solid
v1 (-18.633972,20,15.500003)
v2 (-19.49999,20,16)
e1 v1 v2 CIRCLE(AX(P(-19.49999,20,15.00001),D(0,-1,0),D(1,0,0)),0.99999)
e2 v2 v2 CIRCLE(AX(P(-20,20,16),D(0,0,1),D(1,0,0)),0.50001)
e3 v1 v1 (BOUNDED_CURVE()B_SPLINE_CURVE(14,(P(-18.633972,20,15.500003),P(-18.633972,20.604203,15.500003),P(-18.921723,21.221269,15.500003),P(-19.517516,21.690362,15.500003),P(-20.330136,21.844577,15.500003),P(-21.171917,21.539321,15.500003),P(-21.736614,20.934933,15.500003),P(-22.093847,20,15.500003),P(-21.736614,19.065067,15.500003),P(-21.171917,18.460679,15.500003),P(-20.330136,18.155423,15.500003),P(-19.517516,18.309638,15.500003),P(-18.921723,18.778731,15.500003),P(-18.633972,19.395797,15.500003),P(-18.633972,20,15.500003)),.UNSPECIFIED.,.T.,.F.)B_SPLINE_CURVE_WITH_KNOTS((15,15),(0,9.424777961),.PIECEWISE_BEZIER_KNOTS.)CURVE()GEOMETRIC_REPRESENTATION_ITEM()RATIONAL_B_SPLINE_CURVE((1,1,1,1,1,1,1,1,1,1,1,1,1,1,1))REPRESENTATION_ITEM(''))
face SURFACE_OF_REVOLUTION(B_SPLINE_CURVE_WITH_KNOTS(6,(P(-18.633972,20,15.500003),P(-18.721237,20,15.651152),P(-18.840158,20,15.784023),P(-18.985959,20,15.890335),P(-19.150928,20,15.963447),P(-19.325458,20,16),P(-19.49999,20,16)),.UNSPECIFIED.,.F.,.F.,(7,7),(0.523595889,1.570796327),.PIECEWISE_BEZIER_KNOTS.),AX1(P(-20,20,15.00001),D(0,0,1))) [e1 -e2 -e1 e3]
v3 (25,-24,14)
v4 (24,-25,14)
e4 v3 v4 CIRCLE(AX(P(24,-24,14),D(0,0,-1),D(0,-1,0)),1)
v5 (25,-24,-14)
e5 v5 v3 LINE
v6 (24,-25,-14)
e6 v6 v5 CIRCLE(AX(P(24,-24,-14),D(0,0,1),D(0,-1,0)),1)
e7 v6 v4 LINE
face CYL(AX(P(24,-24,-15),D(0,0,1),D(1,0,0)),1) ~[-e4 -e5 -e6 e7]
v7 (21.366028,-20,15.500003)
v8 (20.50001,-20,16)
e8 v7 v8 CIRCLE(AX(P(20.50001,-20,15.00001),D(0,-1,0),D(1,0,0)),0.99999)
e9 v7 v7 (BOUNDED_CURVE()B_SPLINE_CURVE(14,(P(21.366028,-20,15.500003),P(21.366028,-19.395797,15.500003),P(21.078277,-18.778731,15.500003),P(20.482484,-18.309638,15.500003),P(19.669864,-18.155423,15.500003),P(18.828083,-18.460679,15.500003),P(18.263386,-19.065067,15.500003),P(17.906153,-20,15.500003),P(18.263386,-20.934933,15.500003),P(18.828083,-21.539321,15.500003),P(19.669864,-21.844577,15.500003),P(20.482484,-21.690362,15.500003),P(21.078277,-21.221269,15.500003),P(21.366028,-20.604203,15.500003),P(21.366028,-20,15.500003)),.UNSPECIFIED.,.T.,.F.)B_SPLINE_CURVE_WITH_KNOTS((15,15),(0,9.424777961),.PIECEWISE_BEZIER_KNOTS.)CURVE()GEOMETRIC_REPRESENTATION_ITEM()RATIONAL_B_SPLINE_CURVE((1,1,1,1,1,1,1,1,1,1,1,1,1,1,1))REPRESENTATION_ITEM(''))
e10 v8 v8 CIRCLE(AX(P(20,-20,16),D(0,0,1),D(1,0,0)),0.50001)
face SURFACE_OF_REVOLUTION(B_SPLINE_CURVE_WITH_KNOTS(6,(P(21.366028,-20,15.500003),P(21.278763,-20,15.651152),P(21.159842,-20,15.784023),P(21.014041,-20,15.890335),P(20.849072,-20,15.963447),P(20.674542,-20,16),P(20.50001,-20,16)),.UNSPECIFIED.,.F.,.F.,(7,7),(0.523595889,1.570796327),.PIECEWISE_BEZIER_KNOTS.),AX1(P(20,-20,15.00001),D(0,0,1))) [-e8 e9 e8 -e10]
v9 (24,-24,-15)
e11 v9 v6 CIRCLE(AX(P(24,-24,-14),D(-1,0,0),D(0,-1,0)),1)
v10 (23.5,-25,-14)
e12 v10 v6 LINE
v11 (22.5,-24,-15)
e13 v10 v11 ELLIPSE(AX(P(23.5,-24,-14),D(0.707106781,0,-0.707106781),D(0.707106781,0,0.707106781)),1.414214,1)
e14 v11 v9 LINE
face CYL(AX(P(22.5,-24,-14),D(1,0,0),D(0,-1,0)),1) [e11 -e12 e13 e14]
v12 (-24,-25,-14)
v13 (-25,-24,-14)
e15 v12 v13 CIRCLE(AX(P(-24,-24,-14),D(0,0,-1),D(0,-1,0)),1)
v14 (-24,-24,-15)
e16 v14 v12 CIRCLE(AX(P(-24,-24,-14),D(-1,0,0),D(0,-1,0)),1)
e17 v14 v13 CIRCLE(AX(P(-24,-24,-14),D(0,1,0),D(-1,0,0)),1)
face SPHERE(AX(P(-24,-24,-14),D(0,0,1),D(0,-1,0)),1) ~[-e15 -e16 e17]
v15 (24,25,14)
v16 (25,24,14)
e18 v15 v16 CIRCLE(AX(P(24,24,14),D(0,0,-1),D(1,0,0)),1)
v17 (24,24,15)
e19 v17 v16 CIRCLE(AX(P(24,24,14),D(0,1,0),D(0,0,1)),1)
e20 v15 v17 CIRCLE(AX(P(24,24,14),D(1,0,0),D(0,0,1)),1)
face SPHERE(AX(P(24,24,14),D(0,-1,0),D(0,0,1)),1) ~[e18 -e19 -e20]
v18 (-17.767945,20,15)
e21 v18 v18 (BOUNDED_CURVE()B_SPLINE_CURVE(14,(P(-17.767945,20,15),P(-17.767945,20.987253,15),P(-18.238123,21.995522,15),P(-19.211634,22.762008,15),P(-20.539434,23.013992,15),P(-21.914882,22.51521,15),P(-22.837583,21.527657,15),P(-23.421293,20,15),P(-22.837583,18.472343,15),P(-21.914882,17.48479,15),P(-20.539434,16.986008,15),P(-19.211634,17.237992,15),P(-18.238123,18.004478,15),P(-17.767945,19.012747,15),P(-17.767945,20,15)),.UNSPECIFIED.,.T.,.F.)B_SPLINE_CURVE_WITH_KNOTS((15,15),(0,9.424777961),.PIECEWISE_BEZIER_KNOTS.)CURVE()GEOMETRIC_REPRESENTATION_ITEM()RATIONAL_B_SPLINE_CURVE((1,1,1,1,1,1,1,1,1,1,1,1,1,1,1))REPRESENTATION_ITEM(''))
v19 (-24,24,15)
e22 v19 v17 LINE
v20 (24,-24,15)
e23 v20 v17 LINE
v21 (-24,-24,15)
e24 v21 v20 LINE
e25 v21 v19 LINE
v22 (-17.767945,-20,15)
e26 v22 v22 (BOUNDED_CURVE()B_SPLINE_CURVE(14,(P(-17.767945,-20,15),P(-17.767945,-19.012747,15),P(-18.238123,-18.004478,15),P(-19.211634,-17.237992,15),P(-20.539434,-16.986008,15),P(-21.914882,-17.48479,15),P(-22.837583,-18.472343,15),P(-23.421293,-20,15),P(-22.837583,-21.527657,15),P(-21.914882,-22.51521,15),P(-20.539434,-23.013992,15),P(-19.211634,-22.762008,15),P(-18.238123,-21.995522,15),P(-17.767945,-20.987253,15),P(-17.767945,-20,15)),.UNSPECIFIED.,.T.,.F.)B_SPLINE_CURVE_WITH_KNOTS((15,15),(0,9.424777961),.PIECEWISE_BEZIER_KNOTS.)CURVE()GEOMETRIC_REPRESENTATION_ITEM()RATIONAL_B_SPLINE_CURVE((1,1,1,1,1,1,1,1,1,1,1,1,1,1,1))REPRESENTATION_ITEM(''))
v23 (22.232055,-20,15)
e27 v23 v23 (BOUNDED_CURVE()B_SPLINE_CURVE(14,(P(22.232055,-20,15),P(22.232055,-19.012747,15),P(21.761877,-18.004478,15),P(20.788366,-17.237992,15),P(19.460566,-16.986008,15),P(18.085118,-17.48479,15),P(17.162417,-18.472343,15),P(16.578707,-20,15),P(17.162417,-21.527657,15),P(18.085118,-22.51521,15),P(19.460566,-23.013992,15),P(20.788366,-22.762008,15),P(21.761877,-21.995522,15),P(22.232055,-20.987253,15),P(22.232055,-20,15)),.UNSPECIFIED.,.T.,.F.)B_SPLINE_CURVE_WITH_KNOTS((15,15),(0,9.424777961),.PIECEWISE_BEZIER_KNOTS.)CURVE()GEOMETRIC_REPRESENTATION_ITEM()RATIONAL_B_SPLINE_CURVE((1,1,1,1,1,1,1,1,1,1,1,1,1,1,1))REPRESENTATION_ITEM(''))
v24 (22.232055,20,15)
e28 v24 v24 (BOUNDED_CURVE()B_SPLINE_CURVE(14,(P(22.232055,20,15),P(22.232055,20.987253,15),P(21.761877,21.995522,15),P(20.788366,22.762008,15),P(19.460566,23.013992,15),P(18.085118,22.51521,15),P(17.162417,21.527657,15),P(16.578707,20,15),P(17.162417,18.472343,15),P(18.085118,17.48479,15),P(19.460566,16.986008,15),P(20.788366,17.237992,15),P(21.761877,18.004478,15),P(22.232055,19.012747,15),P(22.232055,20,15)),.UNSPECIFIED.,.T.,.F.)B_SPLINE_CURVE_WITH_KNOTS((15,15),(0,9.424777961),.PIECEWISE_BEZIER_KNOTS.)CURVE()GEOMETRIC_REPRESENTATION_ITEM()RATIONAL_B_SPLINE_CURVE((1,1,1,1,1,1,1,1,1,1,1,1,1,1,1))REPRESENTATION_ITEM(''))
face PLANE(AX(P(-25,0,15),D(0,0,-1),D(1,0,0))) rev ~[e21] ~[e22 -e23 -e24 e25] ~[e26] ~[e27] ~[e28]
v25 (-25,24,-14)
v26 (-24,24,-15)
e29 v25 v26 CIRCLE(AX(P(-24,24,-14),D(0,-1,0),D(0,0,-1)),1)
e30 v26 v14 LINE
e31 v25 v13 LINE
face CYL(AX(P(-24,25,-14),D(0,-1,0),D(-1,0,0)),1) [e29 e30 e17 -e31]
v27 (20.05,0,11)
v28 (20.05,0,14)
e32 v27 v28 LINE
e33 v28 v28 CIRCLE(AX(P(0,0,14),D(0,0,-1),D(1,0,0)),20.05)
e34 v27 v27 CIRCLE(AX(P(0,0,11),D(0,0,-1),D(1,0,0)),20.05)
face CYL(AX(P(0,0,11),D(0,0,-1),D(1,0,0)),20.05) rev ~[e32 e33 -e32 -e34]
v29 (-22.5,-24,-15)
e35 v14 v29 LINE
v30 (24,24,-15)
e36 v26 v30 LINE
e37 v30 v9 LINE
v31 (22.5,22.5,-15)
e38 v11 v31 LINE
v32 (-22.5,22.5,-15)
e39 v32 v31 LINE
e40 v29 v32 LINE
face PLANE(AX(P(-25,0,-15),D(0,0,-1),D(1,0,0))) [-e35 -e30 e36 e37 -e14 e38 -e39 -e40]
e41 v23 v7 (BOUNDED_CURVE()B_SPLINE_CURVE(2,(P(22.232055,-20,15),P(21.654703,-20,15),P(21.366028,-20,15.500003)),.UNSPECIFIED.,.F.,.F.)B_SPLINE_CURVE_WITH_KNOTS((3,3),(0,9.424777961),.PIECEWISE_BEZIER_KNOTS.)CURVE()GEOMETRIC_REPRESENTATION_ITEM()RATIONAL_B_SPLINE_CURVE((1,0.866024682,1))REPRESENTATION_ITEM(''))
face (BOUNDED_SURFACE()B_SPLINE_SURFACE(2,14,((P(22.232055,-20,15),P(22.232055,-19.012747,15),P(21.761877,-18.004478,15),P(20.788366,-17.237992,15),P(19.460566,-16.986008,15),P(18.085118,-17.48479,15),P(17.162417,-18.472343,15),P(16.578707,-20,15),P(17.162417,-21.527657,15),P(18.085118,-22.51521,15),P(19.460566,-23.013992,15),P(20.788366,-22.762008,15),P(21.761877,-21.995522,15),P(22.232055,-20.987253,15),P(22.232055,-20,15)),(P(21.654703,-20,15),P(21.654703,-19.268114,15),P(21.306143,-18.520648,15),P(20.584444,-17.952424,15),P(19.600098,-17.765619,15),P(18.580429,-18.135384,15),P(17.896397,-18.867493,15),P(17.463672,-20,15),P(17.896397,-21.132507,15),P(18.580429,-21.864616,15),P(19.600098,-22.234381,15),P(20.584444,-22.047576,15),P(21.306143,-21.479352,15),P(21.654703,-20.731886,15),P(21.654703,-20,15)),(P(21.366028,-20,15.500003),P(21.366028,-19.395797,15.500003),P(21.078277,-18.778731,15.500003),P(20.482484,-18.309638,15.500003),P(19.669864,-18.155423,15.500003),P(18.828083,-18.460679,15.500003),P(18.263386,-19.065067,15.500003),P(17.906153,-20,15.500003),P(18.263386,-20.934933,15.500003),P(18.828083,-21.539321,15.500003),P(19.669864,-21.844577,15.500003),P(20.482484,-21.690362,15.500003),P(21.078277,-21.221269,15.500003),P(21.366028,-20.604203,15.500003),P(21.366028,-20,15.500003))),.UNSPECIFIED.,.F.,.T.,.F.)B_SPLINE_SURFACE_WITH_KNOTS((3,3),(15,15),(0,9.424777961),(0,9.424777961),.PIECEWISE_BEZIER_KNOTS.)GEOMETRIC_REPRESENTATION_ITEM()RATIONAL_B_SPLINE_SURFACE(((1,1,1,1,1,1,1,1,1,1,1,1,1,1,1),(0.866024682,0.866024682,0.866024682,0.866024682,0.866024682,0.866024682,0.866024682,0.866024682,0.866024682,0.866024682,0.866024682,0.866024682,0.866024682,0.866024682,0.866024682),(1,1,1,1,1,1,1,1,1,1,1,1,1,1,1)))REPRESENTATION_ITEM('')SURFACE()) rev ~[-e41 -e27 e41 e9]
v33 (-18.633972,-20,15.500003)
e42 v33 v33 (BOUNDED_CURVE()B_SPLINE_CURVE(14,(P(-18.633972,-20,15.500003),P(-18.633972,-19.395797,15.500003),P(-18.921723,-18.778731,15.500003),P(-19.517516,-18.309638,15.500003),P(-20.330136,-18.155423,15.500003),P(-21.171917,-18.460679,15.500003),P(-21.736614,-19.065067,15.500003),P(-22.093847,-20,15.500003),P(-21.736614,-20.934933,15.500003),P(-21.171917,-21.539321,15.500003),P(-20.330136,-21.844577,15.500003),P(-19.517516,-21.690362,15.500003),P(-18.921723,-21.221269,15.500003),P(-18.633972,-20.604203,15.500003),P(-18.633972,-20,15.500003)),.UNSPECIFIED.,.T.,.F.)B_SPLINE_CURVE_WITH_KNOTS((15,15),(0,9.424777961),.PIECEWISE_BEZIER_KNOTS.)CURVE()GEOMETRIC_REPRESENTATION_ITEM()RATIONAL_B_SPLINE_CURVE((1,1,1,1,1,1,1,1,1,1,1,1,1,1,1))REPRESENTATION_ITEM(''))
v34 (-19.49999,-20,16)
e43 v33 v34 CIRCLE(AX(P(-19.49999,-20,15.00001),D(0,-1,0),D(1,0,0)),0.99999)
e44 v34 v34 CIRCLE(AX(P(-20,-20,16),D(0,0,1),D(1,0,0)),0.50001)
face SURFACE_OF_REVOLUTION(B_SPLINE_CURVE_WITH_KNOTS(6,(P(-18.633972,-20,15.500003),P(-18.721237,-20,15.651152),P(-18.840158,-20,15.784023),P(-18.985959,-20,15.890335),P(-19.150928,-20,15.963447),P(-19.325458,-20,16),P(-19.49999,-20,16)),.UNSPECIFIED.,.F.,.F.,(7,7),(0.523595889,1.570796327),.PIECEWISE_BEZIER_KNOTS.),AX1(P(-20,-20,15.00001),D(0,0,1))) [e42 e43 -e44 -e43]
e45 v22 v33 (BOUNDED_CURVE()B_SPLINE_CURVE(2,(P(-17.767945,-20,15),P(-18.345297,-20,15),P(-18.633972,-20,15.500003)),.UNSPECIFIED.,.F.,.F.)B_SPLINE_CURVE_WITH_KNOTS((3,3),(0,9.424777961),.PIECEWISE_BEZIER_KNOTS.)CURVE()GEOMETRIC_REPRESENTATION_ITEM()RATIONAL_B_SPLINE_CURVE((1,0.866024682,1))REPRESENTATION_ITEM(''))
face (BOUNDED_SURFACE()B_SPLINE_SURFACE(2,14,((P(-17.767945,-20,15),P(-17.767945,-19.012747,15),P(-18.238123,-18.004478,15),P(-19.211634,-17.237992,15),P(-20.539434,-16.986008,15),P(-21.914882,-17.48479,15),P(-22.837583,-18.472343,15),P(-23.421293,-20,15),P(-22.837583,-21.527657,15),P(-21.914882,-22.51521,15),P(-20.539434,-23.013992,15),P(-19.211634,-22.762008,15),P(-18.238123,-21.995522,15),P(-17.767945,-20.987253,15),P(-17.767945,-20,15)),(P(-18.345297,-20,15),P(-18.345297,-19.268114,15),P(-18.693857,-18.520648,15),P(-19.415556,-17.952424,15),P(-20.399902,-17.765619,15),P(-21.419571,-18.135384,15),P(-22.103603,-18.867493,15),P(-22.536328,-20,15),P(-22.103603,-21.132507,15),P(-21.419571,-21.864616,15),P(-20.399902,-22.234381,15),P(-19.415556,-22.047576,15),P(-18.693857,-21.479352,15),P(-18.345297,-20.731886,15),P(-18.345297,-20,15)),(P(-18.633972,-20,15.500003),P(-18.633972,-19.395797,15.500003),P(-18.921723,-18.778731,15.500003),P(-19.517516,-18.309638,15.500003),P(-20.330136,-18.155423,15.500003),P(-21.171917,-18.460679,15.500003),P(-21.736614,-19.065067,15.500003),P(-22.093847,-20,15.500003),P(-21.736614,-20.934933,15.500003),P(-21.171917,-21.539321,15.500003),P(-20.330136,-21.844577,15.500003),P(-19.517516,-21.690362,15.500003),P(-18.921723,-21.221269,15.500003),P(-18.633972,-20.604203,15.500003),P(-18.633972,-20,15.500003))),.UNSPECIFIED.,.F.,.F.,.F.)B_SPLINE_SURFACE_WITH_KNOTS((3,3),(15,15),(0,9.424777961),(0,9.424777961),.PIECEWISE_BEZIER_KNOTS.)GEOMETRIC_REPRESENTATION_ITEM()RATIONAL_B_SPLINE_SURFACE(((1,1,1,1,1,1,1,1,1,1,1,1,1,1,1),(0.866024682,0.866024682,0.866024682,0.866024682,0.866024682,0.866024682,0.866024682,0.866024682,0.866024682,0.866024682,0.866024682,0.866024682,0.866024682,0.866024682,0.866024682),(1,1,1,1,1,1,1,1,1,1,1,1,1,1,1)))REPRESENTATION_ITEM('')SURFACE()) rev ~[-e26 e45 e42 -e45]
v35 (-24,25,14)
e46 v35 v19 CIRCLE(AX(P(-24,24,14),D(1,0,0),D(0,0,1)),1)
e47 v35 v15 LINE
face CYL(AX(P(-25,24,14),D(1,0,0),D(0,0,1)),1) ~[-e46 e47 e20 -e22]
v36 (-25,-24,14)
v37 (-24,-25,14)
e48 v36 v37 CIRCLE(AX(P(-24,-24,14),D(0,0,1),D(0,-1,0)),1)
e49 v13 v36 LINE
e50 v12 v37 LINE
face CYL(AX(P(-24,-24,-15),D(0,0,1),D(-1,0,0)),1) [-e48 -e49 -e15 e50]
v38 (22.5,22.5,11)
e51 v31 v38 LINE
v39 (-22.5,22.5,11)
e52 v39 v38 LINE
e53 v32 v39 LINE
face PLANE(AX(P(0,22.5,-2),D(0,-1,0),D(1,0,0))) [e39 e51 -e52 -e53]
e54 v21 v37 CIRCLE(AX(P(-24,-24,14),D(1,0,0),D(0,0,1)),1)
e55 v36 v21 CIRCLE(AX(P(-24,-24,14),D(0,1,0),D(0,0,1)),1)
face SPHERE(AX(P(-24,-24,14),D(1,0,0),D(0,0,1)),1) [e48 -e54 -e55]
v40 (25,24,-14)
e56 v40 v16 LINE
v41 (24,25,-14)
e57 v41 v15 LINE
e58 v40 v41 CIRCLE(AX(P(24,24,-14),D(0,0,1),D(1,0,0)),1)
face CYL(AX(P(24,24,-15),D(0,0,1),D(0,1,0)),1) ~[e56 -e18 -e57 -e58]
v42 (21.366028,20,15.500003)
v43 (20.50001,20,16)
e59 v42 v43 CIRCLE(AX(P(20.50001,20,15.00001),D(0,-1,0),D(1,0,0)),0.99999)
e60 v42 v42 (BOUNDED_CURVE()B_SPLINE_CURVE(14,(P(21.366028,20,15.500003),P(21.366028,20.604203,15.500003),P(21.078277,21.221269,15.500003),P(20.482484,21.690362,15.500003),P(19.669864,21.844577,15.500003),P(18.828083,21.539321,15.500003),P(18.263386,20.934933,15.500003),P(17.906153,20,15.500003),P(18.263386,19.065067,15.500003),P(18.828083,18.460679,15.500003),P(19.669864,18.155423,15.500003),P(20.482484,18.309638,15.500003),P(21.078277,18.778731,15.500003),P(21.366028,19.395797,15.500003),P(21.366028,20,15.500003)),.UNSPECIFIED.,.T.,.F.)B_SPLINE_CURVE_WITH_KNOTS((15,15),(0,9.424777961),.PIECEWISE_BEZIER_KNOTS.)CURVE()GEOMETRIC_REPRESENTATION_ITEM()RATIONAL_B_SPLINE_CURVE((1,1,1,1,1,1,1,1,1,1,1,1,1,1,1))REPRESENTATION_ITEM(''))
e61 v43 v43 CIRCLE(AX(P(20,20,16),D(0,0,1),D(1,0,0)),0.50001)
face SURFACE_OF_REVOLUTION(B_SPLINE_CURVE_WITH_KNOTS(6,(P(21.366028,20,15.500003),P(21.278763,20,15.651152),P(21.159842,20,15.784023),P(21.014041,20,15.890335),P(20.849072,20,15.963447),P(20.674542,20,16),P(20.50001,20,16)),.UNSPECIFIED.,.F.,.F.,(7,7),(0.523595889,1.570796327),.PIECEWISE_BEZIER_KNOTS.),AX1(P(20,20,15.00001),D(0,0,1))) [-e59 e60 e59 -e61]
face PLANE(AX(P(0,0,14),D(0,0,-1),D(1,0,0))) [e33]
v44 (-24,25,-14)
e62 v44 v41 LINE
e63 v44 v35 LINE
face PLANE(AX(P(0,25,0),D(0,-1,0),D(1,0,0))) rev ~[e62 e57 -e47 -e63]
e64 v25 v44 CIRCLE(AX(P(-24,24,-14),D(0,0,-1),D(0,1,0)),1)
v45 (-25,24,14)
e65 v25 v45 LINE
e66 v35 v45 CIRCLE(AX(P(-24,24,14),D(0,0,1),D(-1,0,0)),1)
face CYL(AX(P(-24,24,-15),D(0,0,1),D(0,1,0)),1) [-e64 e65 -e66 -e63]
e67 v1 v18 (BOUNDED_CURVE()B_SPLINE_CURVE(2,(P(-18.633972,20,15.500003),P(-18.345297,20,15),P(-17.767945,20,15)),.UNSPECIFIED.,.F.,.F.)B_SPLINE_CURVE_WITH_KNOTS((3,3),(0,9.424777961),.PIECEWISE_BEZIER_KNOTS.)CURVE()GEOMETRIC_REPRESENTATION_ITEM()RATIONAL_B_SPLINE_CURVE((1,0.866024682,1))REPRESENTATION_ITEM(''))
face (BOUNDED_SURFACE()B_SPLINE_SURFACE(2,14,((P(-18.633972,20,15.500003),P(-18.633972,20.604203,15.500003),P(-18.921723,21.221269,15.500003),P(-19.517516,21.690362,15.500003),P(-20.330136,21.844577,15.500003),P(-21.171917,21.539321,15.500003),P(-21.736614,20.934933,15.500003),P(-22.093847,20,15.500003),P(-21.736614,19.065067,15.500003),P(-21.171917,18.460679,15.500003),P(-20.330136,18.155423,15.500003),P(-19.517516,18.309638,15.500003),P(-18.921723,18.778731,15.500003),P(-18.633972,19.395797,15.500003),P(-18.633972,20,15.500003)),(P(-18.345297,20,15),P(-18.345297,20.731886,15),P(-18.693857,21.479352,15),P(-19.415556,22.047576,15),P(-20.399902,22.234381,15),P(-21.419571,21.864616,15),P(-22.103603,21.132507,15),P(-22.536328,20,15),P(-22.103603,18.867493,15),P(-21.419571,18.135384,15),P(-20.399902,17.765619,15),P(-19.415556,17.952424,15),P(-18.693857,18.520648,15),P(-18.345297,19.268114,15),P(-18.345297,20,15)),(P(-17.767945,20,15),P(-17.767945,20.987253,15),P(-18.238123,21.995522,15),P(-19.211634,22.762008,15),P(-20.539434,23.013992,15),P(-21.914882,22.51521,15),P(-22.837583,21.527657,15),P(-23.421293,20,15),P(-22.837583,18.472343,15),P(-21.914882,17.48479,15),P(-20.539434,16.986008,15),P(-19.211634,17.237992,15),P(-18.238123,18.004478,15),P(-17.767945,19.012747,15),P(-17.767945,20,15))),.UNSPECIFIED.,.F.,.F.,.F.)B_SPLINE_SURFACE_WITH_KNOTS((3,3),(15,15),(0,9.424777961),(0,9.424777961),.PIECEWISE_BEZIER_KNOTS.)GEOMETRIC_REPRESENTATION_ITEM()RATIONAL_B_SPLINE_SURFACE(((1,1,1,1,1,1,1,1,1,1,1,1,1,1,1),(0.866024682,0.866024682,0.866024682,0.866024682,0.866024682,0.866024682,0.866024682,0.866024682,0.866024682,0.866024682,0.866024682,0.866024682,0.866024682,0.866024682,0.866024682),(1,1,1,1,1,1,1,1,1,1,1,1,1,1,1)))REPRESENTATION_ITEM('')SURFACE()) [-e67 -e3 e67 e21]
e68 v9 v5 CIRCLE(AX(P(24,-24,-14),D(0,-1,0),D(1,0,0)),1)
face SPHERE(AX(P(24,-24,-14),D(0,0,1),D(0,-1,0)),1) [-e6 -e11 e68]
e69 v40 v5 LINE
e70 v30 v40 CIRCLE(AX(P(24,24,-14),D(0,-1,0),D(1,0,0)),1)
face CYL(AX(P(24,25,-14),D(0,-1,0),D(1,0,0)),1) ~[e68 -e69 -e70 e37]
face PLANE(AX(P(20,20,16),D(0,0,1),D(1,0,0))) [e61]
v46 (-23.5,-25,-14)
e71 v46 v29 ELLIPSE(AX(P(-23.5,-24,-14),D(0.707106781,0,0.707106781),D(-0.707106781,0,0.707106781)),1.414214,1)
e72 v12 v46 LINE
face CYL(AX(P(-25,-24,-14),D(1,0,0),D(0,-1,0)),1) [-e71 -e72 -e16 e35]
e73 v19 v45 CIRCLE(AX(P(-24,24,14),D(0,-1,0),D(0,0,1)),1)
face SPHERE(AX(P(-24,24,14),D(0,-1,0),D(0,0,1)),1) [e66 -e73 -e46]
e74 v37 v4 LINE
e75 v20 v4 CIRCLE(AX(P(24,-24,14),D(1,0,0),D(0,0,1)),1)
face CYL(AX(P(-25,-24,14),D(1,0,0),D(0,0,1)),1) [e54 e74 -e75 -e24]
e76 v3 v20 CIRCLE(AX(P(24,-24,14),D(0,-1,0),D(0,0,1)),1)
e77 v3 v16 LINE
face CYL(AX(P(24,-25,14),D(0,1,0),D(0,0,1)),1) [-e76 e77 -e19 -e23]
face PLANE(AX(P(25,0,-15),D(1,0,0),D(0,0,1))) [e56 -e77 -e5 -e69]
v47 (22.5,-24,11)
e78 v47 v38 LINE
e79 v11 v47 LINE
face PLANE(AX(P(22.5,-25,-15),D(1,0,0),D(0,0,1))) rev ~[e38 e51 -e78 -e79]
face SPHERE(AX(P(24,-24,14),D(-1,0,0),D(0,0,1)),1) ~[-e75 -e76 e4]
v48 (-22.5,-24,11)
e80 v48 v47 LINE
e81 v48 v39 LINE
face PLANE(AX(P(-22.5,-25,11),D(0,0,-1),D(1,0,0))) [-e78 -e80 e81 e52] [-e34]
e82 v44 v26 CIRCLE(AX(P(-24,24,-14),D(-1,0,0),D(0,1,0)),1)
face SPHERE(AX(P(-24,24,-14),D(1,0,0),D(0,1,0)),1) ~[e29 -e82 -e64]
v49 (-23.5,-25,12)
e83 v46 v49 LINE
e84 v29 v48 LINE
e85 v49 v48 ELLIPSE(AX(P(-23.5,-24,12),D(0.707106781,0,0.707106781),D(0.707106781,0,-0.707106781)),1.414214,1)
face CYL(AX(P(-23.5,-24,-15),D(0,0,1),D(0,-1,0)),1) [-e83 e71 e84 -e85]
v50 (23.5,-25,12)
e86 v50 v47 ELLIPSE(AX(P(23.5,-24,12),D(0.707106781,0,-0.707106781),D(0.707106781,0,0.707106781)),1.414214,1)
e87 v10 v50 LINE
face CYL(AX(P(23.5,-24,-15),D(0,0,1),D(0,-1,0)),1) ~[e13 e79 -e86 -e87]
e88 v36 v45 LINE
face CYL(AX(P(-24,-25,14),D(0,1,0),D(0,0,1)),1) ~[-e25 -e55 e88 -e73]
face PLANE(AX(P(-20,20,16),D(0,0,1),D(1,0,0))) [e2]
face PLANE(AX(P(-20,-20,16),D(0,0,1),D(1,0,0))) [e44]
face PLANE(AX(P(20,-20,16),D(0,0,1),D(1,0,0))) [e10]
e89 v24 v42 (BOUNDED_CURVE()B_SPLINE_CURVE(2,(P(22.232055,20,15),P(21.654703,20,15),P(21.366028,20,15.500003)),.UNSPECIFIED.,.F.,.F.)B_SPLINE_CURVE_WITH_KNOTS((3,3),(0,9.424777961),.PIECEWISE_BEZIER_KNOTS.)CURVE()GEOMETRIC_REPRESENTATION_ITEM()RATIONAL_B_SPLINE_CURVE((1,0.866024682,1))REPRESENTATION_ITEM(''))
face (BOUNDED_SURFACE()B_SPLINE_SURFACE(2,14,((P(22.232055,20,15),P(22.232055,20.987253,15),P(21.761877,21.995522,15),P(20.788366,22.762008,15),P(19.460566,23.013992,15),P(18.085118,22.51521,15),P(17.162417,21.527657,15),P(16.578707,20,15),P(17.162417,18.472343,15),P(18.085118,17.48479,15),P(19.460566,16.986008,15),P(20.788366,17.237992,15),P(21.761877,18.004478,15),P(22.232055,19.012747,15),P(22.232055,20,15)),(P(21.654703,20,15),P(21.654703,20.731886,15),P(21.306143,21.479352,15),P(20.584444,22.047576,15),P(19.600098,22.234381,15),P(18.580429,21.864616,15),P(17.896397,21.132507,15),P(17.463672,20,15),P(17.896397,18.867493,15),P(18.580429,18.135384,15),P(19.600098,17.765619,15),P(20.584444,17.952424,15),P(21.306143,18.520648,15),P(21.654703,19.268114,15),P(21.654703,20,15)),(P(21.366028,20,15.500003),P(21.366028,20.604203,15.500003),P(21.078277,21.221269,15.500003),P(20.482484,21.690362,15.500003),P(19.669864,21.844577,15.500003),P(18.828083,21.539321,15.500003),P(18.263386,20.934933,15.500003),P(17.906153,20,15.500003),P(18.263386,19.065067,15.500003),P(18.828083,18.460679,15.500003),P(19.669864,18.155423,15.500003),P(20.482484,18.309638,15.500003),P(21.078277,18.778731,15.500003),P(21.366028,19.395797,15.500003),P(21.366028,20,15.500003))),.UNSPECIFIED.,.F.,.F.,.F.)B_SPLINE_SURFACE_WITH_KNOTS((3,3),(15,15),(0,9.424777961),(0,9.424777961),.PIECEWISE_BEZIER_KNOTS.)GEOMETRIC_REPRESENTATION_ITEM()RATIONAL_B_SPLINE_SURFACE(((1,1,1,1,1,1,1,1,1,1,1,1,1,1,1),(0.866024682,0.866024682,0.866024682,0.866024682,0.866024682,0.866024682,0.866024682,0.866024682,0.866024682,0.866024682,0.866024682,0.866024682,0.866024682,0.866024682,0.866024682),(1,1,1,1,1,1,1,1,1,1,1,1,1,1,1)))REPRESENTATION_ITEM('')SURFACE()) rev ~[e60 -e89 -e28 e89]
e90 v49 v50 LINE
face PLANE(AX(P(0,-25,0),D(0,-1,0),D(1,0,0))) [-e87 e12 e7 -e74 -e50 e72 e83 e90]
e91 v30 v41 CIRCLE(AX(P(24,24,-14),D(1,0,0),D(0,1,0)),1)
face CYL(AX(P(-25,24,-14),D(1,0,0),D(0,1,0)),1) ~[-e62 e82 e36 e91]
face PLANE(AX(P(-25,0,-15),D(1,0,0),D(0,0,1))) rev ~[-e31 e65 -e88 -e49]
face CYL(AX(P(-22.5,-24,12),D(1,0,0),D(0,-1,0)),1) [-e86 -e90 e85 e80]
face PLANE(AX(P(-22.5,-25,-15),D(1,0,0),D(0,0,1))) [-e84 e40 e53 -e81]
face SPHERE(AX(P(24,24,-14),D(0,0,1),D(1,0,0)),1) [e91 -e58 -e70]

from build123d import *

# Parameters (mm, degrees)
F0_W          = 50
F0_H          = 30
F1_DEPTH      = 25
F1_DEPTH_BACK = 25
F2_W          = 45
F2_H          = 26
F3_DEPTH      = 47.5
F4_R          = 20.05
F5_DEPTH      = 3
F6_R          = 1.5
F7_DEPTH      = 1
F8_R          = 0.99999
F9_R          = 1


# Not quite as in the source:
# - a fillet or chamfer is up to 0.001 mm smaller than in the source, because OpenCascade refuses the exact size


with BuildPart() as f1:
    # F0 (on Front) → F1 (new body, two sides)
    with BuildSketch(Plane.XZ) as f1_sk:
        Rectangle(F0_W, F0_H)
    extrude(amount=F1_DEPTH)
    extrude(f1_sk.sketch, amount=-F1_DEPTH_BACK)

    # F2 (on face) → F3 (cut)
    with BuildSketch(Plane.XZ.offset(25)):
        with Locations((0, -2)):
            Rectangle(F2_W, F2_H)
    extrude(amount=-F3_DEPTH, mode=Mode.SUBTRACT)

    # F4 (on face) → F5 (cut)
    with BuildSketch(Plane(origin=(0, 0, 11), x_dir=(1, 0, 0), z_dir=(0, 0, -1))):
        Circle(F4_R)
    extrude(amount=-F5_DEPTH, mode=Mode.SUBTRACT)

    # F6 (on face) → F7 (join)
    with BuildSketch(Plane.XY.offset(15)):
        with Locations((-20, 20)):
            Circle(F6_R)
        with Locations((20, 20)):
            Circle(F6_R)
        with Locations((20, -20)):
            Circle(F6_R)
        with Locations((-20, -20)):
            Circle(F6_R)
    extrude(amount=F7_DEPTH)

    # F8 (radius 1 in the source; OpenCascade refuses exactly that, so slightly less here)
    f8_edges = [f1.edges().sort_by_distance(p)[0] for p in [
        (-21.5, -20, 16),
        (18.5, -20, 16),
        (18.5, 20, 16),
        (-21.5, 20, 16),
    ]]
    fillet(f8_edges, radius=F8_R)

    # F9
    f9_edges = [f1.edges().sort_by_distance(p)[0] for p in [
        (0, -25, 15),
        (25, 0, 15),
        (-25, 0, 15),
        (0, 25, 15),
        (18.5, -20, 15),
        (-21.5, -20, 15),
        (18.5, 20, 15),
        (-21.5, 20, 15),
        (-25, -25, 0),
        (25, -25, 0),
        (23.75, -25, -15),
        (22.5, -25, -2),
        (0, -25, 11),
        (-22.5, -25, -2),
        (-23.75, -25, -15),
        (25, 25, 0),
        (25, 0, -15),
        (0, 25, -15),
        (-25, 25, 0),
        (-25, 0, -15),
    ]]
    fillet(f9_edges, radius=F9_R)


solid = f1.part
